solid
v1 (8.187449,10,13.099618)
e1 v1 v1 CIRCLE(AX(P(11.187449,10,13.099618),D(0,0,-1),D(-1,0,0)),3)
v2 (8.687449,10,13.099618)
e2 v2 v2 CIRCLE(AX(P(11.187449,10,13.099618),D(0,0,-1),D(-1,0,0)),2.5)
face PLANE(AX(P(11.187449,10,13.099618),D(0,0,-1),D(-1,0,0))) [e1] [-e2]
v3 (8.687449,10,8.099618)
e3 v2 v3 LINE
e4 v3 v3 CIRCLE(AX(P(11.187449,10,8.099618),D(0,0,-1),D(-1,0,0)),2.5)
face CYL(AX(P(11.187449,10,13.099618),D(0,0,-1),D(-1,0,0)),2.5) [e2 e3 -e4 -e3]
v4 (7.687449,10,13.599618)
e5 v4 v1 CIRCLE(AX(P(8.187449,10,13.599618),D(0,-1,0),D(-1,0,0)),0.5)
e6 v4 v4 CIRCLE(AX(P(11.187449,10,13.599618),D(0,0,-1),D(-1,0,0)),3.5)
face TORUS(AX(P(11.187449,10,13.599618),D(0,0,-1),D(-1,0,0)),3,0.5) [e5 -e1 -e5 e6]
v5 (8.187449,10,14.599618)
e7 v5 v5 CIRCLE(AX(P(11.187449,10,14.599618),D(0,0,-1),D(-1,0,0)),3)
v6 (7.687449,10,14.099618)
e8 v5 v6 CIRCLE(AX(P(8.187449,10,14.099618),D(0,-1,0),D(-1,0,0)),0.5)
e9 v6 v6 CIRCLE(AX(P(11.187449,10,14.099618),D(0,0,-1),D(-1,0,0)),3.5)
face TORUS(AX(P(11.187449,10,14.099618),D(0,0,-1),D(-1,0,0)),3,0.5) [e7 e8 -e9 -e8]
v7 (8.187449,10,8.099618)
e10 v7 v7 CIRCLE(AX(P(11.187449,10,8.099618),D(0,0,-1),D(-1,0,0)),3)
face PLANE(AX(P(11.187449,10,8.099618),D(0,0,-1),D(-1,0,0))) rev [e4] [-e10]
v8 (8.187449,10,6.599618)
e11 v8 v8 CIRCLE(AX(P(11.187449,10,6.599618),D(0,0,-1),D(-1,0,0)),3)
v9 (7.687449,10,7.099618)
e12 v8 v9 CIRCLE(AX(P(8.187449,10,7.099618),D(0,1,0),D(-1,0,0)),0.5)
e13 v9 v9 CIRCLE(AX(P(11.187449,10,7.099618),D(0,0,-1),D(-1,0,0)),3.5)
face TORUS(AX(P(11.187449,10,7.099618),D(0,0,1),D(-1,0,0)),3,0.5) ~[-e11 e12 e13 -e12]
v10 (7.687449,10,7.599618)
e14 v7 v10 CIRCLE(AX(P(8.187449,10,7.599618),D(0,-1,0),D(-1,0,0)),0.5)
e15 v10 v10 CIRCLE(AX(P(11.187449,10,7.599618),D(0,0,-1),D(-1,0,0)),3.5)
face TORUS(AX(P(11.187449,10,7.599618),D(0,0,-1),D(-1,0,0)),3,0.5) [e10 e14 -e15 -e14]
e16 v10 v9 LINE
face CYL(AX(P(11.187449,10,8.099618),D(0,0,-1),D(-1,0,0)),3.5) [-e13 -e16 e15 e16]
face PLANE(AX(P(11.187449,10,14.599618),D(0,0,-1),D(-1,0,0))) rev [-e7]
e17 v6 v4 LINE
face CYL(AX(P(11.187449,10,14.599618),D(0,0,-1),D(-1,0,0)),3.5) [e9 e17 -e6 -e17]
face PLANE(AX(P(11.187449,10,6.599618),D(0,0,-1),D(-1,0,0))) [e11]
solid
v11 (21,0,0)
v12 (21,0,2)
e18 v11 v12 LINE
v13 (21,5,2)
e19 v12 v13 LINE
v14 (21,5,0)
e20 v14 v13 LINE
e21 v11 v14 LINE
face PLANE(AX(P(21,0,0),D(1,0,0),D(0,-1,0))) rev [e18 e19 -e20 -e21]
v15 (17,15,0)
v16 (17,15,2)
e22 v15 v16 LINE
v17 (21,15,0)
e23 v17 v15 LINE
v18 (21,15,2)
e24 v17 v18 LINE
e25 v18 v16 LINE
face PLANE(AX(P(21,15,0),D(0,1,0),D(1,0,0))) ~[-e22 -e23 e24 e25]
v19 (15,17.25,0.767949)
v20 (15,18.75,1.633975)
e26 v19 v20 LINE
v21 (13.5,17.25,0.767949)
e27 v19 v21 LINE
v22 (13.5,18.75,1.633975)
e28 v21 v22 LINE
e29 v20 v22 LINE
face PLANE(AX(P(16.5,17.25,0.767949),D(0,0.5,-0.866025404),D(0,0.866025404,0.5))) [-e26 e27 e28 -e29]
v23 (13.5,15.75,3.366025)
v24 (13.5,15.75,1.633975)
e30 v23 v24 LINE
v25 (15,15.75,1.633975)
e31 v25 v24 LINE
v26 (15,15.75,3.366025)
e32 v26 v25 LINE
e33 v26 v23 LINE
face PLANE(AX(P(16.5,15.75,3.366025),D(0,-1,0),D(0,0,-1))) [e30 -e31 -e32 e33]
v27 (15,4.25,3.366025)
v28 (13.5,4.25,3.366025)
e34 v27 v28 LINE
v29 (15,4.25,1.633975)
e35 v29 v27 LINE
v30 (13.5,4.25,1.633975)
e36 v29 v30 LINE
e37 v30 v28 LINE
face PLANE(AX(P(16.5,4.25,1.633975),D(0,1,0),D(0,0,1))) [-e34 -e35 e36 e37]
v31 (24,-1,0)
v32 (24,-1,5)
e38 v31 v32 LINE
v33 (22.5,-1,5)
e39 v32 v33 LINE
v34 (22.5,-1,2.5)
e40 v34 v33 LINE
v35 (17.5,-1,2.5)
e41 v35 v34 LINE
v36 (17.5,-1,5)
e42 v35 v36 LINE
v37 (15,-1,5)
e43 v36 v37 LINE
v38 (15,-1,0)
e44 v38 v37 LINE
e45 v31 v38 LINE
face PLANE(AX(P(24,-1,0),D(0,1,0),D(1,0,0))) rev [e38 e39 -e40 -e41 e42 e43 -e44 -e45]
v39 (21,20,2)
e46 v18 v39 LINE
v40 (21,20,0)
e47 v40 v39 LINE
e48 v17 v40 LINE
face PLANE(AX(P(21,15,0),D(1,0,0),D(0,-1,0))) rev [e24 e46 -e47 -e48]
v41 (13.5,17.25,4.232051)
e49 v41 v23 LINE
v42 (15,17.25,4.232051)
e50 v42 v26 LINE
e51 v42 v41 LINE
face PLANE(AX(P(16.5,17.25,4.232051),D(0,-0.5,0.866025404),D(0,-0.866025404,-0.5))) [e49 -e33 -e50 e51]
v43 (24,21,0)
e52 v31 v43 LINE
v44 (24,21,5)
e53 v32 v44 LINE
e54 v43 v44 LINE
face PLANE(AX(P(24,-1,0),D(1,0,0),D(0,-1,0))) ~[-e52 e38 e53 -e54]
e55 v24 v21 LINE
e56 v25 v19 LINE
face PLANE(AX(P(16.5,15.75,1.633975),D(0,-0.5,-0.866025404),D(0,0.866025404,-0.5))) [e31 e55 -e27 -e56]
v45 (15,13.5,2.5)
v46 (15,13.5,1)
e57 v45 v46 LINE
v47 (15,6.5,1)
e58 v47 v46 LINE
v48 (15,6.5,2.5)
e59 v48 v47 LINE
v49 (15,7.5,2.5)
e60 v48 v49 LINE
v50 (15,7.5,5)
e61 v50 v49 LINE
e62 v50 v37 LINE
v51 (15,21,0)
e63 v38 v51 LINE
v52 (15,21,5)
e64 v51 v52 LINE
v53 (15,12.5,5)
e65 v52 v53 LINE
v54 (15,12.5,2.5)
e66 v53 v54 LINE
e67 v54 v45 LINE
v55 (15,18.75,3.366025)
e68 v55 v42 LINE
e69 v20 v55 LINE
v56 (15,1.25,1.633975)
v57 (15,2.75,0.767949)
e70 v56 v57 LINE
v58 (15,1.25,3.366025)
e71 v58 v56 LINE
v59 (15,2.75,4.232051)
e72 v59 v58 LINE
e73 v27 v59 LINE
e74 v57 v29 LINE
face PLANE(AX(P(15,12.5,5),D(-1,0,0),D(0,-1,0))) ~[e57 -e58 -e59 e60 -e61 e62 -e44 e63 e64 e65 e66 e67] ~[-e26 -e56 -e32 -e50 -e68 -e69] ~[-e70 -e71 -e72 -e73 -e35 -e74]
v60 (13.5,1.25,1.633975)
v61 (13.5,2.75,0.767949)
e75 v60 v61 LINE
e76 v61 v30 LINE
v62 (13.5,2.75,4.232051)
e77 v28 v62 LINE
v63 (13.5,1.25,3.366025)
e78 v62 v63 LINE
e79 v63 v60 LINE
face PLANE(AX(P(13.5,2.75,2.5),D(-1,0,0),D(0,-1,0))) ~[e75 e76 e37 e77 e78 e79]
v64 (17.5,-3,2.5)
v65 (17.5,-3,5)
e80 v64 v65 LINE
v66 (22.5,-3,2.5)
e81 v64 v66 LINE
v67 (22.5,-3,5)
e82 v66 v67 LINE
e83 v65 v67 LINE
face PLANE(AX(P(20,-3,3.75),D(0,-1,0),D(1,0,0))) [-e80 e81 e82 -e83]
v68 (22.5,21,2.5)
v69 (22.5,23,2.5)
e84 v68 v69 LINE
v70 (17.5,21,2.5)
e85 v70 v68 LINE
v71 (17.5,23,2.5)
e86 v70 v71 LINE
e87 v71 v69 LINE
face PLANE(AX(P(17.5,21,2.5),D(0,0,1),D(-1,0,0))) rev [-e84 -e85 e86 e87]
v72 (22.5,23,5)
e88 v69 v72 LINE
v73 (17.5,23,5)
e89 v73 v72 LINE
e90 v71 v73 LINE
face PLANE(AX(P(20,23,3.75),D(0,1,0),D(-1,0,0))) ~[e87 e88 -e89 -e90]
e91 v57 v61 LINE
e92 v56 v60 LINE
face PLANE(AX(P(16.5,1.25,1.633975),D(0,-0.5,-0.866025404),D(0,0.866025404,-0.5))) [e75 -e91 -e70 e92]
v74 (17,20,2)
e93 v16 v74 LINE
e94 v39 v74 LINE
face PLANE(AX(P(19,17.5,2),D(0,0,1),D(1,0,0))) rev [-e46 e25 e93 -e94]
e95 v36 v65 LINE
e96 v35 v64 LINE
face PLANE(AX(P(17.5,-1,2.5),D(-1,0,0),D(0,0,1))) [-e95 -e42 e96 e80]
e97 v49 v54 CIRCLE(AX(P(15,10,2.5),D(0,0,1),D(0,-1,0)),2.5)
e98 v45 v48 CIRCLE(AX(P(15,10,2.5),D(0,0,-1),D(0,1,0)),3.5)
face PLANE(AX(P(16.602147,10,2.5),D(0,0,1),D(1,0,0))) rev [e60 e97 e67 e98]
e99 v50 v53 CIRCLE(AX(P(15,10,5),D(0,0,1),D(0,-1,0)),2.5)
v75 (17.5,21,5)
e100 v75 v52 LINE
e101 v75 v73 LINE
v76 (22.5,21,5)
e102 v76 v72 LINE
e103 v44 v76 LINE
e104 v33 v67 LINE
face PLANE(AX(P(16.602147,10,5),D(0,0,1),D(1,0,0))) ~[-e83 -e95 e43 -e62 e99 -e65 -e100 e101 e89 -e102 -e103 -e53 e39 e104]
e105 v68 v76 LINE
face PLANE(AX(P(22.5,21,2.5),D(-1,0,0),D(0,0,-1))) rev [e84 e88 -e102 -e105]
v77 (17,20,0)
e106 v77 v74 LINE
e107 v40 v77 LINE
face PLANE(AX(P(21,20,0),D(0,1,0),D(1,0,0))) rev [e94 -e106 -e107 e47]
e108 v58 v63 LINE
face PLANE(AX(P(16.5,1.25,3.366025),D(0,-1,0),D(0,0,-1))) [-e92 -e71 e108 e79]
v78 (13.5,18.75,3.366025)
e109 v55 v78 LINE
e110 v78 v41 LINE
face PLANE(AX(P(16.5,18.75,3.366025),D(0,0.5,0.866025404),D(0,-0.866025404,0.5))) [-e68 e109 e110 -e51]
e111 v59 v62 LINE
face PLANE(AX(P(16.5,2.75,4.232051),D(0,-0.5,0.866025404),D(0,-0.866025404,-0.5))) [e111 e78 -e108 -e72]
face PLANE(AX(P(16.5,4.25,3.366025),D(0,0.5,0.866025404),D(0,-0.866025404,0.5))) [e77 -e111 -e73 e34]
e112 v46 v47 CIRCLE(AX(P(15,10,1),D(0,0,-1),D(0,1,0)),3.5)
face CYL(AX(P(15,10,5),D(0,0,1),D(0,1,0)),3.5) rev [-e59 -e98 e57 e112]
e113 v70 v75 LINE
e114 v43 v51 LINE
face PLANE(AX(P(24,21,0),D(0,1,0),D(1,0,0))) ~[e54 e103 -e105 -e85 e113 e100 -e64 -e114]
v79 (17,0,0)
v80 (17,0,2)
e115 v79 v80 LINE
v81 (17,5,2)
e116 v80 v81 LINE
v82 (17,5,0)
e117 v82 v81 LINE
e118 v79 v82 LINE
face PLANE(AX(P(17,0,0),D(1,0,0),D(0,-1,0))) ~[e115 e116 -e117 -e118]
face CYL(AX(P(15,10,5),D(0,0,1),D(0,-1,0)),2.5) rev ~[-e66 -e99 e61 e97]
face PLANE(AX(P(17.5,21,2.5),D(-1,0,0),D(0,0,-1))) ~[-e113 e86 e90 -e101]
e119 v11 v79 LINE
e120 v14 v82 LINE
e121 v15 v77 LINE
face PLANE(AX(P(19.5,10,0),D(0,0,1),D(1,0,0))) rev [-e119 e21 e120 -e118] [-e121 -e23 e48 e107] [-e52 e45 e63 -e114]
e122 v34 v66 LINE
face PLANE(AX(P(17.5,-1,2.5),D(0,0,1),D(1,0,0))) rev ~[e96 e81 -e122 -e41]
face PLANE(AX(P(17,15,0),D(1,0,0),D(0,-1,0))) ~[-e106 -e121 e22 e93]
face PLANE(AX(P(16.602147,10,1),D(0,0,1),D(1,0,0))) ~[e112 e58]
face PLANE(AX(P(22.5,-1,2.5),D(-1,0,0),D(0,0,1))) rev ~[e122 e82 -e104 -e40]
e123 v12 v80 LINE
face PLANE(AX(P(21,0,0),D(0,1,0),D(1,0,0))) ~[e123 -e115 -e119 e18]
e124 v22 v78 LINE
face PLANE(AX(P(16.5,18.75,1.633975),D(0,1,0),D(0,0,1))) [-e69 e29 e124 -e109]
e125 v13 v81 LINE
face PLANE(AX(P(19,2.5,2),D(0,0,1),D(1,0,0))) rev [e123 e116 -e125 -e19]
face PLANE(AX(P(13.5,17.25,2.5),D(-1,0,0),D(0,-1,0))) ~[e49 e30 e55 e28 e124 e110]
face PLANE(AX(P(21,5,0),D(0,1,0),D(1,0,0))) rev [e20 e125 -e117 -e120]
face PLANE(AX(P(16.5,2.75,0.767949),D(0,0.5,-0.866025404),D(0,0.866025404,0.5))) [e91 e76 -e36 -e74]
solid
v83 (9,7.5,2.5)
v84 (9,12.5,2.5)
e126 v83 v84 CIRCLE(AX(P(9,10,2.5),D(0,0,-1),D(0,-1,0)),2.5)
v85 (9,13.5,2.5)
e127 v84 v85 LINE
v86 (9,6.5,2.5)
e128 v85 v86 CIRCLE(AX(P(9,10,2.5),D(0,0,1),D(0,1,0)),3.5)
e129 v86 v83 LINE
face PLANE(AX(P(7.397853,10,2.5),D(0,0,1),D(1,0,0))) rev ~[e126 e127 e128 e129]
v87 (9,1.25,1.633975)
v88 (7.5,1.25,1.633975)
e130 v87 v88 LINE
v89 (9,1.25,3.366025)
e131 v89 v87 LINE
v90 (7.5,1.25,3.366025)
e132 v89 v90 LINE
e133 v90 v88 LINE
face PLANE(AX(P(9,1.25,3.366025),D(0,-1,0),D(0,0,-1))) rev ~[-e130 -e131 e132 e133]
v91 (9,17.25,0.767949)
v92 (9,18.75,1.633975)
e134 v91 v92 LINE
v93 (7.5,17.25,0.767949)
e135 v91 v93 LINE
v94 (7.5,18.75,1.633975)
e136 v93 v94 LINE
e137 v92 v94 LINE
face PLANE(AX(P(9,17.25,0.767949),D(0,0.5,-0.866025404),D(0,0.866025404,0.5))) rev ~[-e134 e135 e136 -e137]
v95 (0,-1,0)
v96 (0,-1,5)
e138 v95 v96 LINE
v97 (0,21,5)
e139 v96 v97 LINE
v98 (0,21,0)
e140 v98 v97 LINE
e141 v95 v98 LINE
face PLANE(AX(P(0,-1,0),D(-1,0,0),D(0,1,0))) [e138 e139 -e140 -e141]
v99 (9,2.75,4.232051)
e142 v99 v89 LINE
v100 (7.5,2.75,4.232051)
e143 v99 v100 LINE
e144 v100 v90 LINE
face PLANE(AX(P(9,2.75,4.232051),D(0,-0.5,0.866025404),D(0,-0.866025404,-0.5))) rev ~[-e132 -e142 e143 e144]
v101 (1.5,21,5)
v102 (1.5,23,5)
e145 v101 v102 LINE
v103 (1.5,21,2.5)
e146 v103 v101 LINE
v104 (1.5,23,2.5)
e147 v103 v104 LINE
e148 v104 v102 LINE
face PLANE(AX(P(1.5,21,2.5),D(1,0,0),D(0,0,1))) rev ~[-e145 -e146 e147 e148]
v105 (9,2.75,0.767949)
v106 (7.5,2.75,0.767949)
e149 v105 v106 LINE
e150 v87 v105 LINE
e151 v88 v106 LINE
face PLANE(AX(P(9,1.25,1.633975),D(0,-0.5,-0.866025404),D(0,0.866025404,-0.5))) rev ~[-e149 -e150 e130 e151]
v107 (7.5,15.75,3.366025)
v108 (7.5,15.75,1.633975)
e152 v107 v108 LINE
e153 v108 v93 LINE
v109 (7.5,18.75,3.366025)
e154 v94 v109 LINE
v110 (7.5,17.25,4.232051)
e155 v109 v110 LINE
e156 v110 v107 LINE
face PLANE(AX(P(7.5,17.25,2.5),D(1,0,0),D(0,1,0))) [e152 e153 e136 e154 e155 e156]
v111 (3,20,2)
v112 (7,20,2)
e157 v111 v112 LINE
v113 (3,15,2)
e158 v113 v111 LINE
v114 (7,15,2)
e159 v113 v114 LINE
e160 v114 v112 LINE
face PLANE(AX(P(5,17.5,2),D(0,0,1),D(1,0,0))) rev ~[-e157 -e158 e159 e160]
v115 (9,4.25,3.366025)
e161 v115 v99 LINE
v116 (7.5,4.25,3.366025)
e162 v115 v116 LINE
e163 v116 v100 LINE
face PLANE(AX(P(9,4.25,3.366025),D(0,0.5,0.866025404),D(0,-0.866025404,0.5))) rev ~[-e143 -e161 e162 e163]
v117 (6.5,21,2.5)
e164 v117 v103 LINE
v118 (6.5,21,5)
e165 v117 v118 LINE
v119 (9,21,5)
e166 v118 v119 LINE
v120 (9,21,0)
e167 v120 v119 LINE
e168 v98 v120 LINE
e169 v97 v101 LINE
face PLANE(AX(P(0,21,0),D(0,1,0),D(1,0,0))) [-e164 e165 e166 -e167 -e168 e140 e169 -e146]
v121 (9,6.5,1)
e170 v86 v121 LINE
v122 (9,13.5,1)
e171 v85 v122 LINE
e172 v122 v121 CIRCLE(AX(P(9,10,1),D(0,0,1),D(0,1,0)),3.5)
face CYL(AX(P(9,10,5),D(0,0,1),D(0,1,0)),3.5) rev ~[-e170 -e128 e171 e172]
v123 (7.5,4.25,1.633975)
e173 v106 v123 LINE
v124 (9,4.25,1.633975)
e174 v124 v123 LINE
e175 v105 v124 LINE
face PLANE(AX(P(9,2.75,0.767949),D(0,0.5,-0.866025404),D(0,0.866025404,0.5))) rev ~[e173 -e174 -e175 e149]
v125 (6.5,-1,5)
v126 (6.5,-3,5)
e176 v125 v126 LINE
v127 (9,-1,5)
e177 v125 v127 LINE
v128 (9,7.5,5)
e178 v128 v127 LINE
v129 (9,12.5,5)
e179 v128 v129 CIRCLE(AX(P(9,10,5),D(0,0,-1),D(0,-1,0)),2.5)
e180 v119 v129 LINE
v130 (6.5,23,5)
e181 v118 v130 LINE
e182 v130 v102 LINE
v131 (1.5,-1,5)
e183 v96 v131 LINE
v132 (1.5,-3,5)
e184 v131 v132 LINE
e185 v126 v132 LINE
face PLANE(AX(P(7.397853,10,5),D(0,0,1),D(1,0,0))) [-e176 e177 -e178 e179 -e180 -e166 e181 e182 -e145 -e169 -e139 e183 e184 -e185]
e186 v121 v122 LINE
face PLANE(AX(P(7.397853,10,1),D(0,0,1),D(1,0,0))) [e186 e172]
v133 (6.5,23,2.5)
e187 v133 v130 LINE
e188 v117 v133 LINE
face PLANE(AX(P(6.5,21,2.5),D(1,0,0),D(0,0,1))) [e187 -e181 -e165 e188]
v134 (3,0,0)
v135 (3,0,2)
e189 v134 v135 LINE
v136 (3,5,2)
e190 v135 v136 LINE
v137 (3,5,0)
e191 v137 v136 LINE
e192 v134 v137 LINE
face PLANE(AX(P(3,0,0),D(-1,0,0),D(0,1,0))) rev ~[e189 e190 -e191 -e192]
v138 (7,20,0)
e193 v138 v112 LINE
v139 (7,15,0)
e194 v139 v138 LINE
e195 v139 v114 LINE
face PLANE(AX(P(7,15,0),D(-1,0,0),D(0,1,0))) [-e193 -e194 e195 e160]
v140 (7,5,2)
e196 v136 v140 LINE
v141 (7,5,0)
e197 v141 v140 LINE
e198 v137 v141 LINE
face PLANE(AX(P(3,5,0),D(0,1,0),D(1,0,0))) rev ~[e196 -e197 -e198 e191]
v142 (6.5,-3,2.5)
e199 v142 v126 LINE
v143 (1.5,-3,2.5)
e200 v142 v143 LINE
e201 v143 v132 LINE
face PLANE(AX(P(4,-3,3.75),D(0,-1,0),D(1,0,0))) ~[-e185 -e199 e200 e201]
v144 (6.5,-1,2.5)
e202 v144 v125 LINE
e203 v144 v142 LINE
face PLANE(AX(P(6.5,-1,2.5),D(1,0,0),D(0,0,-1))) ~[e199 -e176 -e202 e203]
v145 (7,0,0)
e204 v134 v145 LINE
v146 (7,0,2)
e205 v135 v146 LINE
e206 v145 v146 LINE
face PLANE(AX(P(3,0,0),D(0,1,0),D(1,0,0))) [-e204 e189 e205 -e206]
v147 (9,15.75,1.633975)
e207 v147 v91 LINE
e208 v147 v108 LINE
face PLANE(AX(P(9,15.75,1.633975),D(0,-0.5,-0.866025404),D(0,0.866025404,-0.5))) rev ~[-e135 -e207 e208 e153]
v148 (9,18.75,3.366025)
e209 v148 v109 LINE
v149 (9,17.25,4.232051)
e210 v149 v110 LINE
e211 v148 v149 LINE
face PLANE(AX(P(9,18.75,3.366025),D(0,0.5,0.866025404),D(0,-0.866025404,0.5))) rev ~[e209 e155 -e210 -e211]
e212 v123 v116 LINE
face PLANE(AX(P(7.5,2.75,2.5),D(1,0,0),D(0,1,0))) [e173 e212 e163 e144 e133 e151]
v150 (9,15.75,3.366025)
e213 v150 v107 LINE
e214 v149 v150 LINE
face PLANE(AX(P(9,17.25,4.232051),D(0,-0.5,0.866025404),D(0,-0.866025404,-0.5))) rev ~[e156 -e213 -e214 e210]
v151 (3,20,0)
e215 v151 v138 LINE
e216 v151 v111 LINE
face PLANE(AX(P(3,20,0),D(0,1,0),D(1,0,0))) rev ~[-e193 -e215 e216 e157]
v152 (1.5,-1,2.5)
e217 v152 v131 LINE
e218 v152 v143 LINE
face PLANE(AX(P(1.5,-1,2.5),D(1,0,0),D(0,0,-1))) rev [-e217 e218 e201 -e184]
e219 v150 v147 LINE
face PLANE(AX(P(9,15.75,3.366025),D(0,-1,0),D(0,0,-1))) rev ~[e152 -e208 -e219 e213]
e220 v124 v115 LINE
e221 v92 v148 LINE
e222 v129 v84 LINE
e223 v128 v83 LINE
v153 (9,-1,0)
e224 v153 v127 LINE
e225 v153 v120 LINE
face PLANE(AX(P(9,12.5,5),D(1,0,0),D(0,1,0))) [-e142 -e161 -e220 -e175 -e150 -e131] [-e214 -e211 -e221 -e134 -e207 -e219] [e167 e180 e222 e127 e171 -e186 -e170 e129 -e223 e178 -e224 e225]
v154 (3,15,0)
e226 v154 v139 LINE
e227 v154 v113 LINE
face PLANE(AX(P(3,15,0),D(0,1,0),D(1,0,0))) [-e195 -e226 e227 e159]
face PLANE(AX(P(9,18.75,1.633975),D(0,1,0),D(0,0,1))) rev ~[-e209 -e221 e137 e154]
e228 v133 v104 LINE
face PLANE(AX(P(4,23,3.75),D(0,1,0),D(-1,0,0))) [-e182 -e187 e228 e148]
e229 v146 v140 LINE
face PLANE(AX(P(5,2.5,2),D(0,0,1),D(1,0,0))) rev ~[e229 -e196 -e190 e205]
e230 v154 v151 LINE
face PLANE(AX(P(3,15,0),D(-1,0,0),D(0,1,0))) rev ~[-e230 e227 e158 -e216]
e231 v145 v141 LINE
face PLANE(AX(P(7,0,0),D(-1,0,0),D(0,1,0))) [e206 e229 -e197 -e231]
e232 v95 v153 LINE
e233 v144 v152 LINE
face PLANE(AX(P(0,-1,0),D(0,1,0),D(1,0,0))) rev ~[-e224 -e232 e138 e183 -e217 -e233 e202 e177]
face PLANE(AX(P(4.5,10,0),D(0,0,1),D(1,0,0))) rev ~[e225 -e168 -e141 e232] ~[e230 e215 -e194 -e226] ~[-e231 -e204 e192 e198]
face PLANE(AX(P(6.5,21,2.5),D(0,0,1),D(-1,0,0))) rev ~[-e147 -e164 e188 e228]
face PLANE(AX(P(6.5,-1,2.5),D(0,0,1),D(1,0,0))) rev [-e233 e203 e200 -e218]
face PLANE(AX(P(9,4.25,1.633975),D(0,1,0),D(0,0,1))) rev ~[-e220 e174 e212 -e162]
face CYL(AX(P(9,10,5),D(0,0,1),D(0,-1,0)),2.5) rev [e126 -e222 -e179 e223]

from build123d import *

# Parameters (mm, degrees)
F0_W      = 9
F0_H      = 22
F0_W_2    = 4
F0_H_2    = 5
F1_DEPTH  = 5
F2_DEPTH  = 2
F4_DEPTH  = 4
F5_DEPTH  = 2.5
F7_DEPTH  = 1.5
F8_W      = 5
F8_H      = 2.5
F9_DEPTH  = 2
F13_DEPTH = 3
F16_R     = 0.5


# Not quite as in the source:
# - a pattern or mirror of a feature is missing from the dataset's text; its kind, count and spacing are read off the source's solid


with BuildPart() as f1:
    # F0 (on Top) → F1 (new body)
    with BuildSketch(Plane.XY):
        with Locations((4.5, 10)):
            Rectangle(F0_W, F0_H)
        with Locations((5, 2.5)):
            Rectangle(F0_W_2, F0_H_2, mode=Mode.SUBTRACT)
        with Locations((5, 17.5)):
            Rectangle(F0_W_2, F0_H_2, mode=Mode.SUBTRACT)
        with Locations((5, 17.5)):
            Rectangle(F0_W_2, F0_H_2)
        with Locations((5, 2.5)):
            Rectangle(F0_W_2, F0_H_2)
    extrude(amount=F1_DEPTH)

    # F0 (on Top) → F2 (cut)
    with BuildSketch(Plane.XY):
        with Locations((5, 2.5)):
            Rectangle(F0_W_2, F0_H_2)
        with Locations((5, 17.5)):
            Rectangle(F0_W_2, F0_H_2)
    extrude(amount=F2_DEPTH, mode=Mode.SUBTRACT)

    # F3 (on face) → F4 (cut)
    with BuildSketch(Plane.XY.offset(5)):
        with BuildLine():
            Line((9, 12.5), (9, 13.5))
            ThreePointArc((9, 13.5), (5.5, 10), (9, 6.5))
            Line((9, 6.5), (9, 7.5))
            ThreePointArc((9, 7.5), (6.5, 10), (9, 12.5))
        make_face()
        with BuildLine():
            Line((9, 7.5), (9, 12.5))
            ThreePointArc((9, 12.5), (6.5, 10), (9, 7.5))
        make_face()
    extrude(amount=-F4_DEPTH, mode=Mode.SUBTRACT)

    # F3 (on face) → F5 (join)
    with BuildSketch(Plane.XY.offset(5)):
        with BuildLine():
            Line((9, 12.5), (9, 13.5))
            ThreePointArc((9, 13.5), (5.5, 10), (9, 6.5))
            Line((9, 6.5), (9, 7.5))
            ThreePointArc((9, 7.5), (6.5, 10), (9, 12.5))
        make_face()
    extrude(amount=-F5_DEPTH)

    # F6 (on face) → F7 (cut)
    with BuildSketch(Plane.YZ.offset(9)):
        Polygon((1.25, 3.3660254038), (1.25, 1.6339745962), (2.75, 0.7679491924), (4.25, 1.6339745962), (4.25, 3.3660254038), (2.75, 4.2320508076), align=None)
        Polygon((18.75, 1.6339745962), (18.75, 3.3660254038), (17.25, 4.2320508076), (15.75, 3.3660254038), (15.75, 1.6339745962), (17.25, 0.7679491924), align=None)
    extrude(amount=-F7_DEPTH, mode=Mode.SUBTRACT)

    # F8 (on face) → F9 (join)
    with BuildSketch(Plane(origin=(0, 21, 0), x_dir=(-1, 0, 0), z_dir=(0, 1, 0))):
        with Locations((-4, 3.75)):
            Rectangle(F8_W, F8_H)
    f9 = extrude(amount=F9_DEPTH)

    # F9_copies: F9 across plane
    add(f9.mirror(Plane(origin=(0, 10, 0), x_dir=(0, 0, -1), z_dir=(0, -1, 0))))


with BuildPart() as f12_1:
    # F12: instance of F1
    add(f1.part.mirror(Plane.YZ.offset(12)))

    # F13 (add): faces of the model
    f13_faces = [f12_1.faces().sort_by_distance(p)[0] for p in [
        (16.5, 2.75, 2.5),
        (16.5, 17.25, 2.5),
    ]]
    extrude(f13_faces, amount=F13_DEPTH)


with BuildPart() as f15:
    # F14 (on offset) → F15 (revolve)
    with BuildSketch(Plane.XZ.offset(-10)):
        Polygon((7.6874490976, 6.599618122), (11.1874490976, 6.599618122), (11.1874490976, 14.599618122), (7.6874490976, 14.599618122), (7.6874490976, 13.099618122), (8.6874490976, 13.099618122), (8.6874490976, 10.599618122), (8.6874490976, 8.099618122), (7.6874490976, 8.099618122), align=None)
    revolve(axis=Axis((11.1874490976, 10, 10.599618122), (0, 0, -1)))

    # F16
    f16_edges = [f15.edges().sort_by_distance(p)[0] for p in [
        (14.687449, 10, 14.599618),
        (14.687449, 10, 8.099618),
        (14.687449, 10, 13.099618),
        (7.687449, 10, 13.849618),
        (14.687449, 10, 6.599618),
        (7.687449, 10, 7.349618),
    ]]
    fillet(f16_edges, radius=F16_R)


solid = Compound([f1.part, f12_1.part, f15.part])
